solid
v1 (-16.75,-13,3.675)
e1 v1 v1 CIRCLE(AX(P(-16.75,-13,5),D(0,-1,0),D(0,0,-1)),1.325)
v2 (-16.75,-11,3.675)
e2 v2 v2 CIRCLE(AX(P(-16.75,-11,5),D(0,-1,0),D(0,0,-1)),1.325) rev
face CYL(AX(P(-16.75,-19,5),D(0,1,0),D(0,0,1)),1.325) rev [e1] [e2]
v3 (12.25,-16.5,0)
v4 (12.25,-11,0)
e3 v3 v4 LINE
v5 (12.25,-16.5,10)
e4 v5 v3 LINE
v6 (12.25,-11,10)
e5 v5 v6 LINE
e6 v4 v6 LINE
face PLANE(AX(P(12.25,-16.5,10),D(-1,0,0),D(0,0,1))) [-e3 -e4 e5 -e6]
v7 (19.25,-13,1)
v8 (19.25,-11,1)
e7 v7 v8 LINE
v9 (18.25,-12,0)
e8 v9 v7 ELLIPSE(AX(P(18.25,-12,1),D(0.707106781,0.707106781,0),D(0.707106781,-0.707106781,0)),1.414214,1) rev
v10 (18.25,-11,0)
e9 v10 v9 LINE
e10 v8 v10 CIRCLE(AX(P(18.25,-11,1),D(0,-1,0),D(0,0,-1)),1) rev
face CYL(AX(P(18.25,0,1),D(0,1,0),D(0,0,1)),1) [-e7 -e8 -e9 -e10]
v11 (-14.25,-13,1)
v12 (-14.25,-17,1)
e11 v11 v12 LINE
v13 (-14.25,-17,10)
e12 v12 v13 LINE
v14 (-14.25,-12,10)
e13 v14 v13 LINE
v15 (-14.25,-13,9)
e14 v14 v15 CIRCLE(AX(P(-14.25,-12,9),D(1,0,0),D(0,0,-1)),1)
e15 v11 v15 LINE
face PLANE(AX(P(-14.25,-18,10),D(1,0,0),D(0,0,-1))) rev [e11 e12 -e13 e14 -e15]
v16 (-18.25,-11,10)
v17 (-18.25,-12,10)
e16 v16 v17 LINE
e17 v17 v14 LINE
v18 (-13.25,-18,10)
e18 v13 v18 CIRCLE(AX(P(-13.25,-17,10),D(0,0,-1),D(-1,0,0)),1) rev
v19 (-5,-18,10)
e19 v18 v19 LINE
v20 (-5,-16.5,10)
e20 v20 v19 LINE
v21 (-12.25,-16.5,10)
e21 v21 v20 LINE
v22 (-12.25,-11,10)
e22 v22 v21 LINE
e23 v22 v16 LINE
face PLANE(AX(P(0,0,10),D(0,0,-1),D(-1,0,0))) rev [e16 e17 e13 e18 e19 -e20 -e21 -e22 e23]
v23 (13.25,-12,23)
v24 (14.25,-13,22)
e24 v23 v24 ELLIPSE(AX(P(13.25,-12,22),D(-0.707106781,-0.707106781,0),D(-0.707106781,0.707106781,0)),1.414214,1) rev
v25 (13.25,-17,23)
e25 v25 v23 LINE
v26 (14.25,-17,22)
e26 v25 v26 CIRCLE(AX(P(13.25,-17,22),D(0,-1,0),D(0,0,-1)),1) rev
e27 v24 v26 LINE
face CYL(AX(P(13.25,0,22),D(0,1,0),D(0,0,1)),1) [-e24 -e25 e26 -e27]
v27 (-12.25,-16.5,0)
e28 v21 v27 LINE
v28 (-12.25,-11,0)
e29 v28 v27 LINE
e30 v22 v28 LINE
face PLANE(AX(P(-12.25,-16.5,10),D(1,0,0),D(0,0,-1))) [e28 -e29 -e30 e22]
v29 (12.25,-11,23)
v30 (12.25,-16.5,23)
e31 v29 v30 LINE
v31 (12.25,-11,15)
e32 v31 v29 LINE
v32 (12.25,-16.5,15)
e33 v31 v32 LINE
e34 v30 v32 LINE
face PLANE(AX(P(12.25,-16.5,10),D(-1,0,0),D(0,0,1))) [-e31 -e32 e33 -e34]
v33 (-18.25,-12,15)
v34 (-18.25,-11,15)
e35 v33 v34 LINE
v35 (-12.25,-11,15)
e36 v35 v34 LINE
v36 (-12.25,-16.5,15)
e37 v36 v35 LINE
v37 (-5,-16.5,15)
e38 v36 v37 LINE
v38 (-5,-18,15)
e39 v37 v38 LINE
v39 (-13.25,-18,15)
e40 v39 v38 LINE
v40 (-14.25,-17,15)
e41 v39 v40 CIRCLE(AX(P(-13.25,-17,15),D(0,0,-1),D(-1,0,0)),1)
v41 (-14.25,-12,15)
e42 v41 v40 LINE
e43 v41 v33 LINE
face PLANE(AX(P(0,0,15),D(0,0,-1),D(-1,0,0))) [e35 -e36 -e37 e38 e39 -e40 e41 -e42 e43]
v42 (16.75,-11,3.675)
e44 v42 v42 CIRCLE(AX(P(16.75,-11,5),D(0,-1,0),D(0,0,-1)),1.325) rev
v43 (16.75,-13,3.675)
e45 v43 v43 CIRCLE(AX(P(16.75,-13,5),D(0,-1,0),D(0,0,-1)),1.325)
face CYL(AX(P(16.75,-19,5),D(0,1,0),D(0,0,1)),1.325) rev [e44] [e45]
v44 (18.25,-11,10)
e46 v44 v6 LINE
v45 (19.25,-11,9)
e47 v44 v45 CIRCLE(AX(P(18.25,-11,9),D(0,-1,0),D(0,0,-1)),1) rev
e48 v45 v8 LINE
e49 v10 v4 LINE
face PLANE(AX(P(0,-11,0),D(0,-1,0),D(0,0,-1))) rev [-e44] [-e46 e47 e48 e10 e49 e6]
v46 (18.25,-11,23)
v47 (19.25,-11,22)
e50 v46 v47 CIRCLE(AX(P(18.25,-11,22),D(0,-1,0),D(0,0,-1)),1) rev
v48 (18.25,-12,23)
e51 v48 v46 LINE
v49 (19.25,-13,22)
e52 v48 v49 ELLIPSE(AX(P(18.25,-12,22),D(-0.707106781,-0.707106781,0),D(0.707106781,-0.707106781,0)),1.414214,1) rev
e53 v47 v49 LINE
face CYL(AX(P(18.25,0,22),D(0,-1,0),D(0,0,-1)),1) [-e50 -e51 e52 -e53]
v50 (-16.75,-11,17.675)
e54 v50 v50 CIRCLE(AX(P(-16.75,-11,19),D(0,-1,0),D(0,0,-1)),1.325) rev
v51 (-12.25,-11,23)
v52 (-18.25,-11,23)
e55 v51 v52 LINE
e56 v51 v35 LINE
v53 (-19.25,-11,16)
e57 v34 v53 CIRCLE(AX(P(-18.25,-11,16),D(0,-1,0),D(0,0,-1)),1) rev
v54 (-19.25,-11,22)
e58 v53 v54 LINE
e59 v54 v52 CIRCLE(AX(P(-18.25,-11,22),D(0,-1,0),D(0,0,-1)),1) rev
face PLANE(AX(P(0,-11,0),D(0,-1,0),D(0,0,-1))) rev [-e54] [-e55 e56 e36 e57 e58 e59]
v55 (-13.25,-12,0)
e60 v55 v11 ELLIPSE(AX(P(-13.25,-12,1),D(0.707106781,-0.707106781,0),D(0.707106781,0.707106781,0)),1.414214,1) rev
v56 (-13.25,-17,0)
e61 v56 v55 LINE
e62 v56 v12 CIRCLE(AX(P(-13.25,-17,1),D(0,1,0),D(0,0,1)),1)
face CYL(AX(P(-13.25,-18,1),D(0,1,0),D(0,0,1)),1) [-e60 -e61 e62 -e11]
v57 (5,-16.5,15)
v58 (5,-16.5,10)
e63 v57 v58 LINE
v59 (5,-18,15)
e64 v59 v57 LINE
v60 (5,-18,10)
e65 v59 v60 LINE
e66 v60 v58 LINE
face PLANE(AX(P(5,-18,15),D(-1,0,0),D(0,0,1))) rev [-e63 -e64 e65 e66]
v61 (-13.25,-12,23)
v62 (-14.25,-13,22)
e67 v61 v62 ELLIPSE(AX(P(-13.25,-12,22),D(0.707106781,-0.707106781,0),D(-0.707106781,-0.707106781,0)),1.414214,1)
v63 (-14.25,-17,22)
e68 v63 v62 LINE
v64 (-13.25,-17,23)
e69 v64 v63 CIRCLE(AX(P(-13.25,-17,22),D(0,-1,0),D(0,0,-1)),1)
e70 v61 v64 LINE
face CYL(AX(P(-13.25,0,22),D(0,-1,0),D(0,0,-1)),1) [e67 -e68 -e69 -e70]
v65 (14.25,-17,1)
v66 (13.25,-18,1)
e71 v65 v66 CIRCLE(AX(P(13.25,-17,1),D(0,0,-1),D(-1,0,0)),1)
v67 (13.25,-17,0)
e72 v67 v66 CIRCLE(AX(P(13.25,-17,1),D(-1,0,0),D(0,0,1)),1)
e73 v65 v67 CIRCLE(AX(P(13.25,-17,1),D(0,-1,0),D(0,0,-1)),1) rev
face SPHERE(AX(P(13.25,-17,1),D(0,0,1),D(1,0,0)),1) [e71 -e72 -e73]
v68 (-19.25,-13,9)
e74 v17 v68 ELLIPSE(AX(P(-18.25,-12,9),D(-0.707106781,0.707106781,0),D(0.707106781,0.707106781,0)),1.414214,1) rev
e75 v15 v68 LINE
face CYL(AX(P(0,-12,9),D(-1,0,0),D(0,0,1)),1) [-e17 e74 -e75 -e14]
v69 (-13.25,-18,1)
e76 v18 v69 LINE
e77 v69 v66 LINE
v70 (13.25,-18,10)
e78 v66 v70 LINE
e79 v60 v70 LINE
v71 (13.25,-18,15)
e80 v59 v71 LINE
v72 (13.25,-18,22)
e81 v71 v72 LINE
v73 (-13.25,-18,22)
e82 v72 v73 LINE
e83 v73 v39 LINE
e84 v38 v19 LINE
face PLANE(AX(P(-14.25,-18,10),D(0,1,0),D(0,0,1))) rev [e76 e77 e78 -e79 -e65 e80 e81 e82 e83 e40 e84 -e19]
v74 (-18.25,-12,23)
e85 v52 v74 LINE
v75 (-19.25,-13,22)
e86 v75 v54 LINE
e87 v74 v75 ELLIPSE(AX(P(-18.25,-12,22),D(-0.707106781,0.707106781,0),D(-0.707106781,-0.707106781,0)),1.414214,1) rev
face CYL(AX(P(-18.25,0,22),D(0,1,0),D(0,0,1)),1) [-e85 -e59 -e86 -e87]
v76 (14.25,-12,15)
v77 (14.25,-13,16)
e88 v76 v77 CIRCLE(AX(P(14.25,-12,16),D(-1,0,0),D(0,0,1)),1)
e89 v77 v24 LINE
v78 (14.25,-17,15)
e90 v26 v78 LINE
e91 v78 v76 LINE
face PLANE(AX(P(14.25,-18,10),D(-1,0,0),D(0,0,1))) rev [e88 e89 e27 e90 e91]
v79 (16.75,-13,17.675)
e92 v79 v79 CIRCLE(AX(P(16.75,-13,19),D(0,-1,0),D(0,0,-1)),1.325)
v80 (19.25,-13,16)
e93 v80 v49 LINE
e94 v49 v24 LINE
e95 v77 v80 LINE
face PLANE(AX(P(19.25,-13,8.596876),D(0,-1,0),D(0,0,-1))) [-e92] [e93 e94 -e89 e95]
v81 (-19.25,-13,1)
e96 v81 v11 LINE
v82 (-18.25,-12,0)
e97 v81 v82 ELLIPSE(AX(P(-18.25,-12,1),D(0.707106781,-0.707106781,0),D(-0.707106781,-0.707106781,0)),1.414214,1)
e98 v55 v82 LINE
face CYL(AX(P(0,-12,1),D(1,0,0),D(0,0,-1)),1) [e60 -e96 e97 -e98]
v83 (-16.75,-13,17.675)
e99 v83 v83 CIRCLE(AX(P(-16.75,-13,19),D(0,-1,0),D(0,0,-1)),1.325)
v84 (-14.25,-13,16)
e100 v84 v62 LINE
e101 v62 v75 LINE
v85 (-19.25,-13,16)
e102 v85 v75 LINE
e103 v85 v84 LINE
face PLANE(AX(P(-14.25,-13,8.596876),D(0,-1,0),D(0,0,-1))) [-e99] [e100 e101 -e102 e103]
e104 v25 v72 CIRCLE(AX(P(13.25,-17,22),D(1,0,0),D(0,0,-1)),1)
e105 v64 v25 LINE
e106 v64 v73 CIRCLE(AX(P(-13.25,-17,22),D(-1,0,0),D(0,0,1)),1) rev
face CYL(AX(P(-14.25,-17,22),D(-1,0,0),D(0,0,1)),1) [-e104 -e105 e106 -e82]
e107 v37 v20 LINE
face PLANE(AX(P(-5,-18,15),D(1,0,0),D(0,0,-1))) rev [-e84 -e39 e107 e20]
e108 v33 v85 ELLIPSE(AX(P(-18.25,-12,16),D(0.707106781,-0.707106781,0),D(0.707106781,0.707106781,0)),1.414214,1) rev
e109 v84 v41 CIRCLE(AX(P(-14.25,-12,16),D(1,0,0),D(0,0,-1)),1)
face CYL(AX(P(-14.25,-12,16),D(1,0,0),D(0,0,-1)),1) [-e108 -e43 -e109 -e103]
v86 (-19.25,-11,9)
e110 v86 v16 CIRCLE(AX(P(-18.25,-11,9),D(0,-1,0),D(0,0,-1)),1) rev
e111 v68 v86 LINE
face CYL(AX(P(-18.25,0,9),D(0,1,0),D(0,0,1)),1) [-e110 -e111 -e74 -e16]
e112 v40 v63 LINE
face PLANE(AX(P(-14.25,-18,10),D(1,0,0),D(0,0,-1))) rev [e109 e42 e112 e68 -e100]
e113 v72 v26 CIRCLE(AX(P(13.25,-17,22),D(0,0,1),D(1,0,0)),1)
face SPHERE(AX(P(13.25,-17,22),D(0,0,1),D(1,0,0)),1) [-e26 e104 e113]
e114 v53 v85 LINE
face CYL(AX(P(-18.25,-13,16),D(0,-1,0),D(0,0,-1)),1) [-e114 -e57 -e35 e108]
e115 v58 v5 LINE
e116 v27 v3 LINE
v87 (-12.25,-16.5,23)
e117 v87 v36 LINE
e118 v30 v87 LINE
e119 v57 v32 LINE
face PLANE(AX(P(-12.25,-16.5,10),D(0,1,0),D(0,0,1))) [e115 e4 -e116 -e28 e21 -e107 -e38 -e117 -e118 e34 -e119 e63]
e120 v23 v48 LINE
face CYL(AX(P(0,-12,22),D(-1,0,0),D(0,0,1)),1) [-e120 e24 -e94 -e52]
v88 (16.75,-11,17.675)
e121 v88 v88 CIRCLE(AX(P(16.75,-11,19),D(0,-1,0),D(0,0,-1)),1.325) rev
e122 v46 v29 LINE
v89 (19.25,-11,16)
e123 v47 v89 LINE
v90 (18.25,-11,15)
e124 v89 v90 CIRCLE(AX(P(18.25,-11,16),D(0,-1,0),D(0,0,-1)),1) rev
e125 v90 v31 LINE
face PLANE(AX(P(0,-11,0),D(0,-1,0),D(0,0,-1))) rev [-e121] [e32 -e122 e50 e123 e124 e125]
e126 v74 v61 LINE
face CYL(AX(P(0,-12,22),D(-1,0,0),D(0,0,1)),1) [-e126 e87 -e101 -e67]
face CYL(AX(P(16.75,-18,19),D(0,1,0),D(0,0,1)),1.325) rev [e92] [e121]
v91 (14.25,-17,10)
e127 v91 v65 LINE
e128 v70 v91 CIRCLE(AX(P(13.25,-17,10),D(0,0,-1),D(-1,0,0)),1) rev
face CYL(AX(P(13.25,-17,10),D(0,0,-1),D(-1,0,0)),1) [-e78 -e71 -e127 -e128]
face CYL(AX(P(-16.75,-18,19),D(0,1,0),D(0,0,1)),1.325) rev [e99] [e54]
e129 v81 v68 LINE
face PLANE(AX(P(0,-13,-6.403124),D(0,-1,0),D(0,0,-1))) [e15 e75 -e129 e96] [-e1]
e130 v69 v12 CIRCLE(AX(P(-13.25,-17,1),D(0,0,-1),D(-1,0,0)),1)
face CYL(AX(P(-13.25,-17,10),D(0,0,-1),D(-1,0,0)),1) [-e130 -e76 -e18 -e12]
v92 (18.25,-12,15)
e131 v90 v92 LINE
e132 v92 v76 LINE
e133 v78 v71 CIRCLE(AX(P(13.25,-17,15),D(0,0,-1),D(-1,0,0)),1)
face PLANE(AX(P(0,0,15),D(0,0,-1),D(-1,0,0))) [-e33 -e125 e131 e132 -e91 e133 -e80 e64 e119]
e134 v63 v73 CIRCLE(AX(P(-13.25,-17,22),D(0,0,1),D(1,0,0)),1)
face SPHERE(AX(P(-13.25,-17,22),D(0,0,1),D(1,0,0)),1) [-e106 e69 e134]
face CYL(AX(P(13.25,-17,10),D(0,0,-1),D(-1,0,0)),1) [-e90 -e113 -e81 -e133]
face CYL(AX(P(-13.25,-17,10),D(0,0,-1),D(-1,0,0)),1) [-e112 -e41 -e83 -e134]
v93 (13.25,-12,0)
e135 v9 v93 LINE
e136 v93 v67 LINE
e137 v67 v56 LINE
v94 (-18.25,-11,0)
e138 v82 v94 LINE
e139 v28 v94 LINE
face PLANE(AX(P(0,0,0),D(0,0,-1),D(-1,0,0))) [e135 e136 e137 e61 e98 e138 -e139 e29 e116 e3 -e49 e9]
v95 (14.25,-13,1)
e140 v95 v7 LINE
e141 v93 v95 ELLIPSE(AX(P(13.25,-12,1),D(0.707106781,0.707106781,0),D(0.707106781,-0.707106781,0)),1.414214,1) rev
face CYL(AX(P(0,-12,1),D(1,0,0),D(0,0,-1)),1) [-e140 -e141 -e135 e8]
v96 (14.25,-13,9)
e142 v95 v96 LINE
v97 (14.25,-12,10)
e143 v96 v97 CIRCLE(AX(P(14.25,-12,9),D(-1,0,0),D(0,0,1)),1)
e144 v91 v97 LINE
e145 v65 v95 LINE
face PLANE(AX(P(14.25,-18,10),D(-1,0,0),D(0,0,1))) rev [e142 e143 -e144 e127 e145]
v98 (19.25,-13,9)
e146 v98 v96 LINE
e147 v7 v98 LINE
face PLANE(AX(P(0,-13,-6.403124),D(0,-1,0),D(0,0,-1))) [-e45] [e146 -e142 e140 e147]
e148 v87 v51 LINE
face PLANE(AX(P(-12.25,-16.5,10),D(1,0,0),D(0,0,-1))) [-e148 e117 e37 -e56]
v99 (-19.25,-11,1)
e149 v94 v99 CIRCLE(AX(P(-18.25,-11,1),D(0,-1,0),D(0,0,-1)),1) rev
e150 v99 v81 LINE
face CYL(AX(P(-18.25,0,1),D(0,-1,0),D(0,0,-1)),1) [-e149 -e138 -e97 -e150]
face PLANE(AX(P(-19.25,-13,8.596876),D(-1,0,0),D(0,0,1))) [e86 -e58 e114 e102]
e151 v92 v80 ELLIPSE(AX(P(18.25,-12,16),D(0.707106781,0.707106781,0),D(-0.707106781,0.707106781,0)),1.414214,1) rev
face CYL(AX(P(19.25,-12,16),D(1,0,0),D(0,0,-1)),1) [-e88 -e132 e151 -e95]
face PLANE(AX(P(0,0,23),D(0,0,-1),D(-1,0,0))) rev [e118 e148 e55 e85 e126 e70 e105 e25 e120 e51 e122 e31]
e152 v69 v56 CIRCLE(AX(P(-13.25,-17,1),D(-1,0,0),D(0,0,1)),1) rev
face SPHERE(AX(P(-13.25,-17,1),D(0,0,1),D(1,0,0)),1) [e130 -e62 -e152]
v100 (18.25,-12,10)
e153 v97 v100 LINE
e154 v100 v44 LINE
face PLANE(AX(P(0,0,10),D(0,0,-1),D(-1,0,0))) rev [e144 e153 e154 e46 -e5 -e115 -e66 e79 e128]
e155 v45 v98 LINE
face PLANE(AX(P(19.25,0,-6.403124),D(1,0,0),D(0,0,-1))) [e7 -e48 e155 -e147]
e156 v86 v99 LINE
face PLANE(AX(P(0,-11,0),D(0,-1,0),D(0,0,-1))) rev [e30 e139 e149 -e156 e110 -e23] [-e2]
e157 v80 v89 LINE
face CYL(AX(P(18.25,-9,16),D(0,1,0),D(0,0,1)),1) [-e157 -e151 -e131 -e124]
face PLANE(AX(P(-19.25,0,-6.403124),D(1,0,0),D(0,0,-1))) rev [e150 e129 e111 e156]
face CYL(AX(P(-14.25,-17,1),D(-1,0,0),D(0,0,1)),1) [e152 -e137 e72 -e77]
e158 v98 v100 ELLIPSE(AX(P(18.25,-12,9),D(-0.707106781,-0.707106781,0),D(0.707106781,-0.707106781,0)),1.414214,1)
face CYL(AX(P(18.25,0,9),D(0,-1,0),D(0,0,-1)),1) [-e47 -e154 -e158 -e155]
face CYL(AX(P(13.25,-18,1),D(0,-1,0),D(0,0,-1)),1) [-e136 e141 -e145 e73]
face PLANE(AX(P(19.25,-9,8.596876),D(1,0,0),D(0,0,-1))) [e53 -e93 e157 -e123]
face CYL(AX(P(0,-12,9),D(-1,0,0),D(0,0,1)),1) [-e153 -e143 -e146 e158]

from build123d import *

# Parameters (mm, degrees)
SKETCH1_W           = 28.5
SKETCH1_H           = 36
SKETCH1_W_2         = 24.5
SKETCH1_H_2         = 33
BOSS_EXTRUDE1_DEPTH = 10
SKETCH2_W           = 5
SKETCH2_H           = 4
BOSS_EXTRUDE2_DEPTH = 10
SKETCH3_R           = 1.325
CUT_EXTRUDE1_DEPTH  = 10
FILLET1_R           = 1
FILLET2_R           = 1
CUT_EXTRUDE2_DEPTH  = 40.322385482
SKETCH5_W           = 15
SKETCH5_H           = 1.5
SKETCH5_W_2         = 2
SKETCH5_H_2         = 10
BOSS_EXTRUDE3_DEPTH = 5
SKETCH6_W           = 10
SKETCH6_H           = 1.5
BOSS_EXTRUDE4_DEPTH = 5
BOSS_EXTRUDE5_DEPTH = 8
SKETCH8_W           = 7
SKETCH8_H           = 3
CUT_EXTRUDE3_DEPTH  = 5
SKETCH9_W           = 5
SKETCH9_H           = 2.1
CUT_EXTRUDE4_DEPTH  = 5
SKETCH10_W          = 10
SKETCH10_H          = 1.5
BOSS_EXTRUDE6_DEPTH = 8
SKETCH11_W          = 5
SKETCH11_H          = 4
BOSS_EXTRUDE7_DEPTH = 8
SKETCH12_R          = 1.325
CUT_EXTRUDE5_DEPTH  = 42.37405588
CUT_EXTRUDE6_DEPTH  = 46.072164359
FILLET3_R           = 1


with BuildPart() as part:
    # Sketch1 → Boss-Extrude1 (new body)
    with BuildSketch(Plane.XY):
        Rectangle(SKETCH1_W, SKETCH1_H)
        Rectangle(SKETCH1_W_2, SKETCH1_H_2, mode=Mode.SUBTRACT)
    extrude(amount=BOSS_EXTRUDE1_DEPTH)

    # Sketch2 → Boss-Extrude2 (add)
    with BuildSketch(Plane.XY.offset(10)):
        with Locations((-16.75, -11)):
            Rectangle(SKETCH2_W, SKETCH2_H)
        with Locations((16.75, -11)):
            Rectangle(SKETCH2_W, SKETCH2_H)
    extrude(amount=-BOSS_EXTRUDE2_DEPTH)

    # Sketch3 → Cut-Extrude1 (cut)
    with BuildSketch(Plane(origin=(0, -9, 0), x_dir=(1, 0, 0), z_dir=(0, 1, 0))):
        with Locations(Location((-16.75, -5, 0), (0, 0, 270))):
            Circle(SKETCH3_R)
        with Locations(Location((16.75, -5, 0), (0, 0, 270))):
            Circle(SKETCH3_R)
    extrude(amount=-CUT_EXTRUDE1_DEPTH, mode=Mode.SUBTRACT)


with BuildPart() as body_2:
    # Split1: the piece on the far side of the plane
    add(part.part)
    split(bisect_by=Plane(origin=(0, -11, 0), x_dir=(0, 0, -1), z_dir=(0, -1, 0)), keep=Keep.BOTTOM)

    # Fillet1
    fillet1_edges = [body_2.edges().sort_by_distance(p)[0] for p in [
        (-16.75, -9, 10),
        (-19.25, -10, 10),
        (-19.25, -10, 0),
        (-16.75, -9, 0),
        (14.25, 4.5, 0),
        (0, 18, 0),
        (-14.25, 4.5, 0),
        (16.75, -9, 0),
        (19.25, -10, 10),
        (19.25, -10, 0),
        (16.75, -9, 10),
    ]]
    fillet(fillet1_edges, radius=FILLET1_R)

    # Sketch4 → Cut-Extrude2 (cut, through all)
    with BuildSketch(Plane.ZY.offset(14.25)):
        with BuildLine():
            Line((7, 12.5), (7, -3.5))
            ThreePointArc((7, -3.5), (5, -5.5), (3, -3.5))
            Line((3, -3.5), (3, 12.5))
            ThreePointArc((3, 12.5), (5, 14.5), (7, 12.5))
        make_face()
    extrude(amount=-CUT_EXTRUDE2_DEPTH, mode=Mode.SUBTRACT)

    # Sketch5 → Boss-Extrude3 (add)
    with BuildSketch(Plane.XY.offset(10)):
        with Locations((0, 17.25)):
            Rectangle(SKETCH5_W, SKETCH5_H)
        with Locations((-13.25, 4)):
            Rectangle(SKETCH5_W_2, SKETCH5_H_2)
        with Locations((13.25, 4)):
            Rectangle(SKETCH5_W_2, SKETCH5_H_2)
    extrude(amount=BOSS_EXTRUDE3_DEPTH)



with BuildPart() as part_1:
    add(part.part)

    # Split1
    split(bisect_by=Plane(origin=(0, -11, 0), x_dir=(0, 0, -1), z_dir=(0, -1, 0)), keep=Keep.TOP)

    # Fillet2
    fillet2_edges = [part_1.edges().sort_by_distance(p)[0] for p in [
        (-14.25, -15.5, 0),
        (-16.75, -13, 0),
        (-19.25, -12, 10),
        (-16.75, -13, 10),
        (-19.25, -12, 0),
        (16.75, -13, 10),
        (19.25, -12, 10),
        (19.25, -12, 0),
        (16.75, -13, 0),
        (0, -18, 0),
        (14.25, -15.5, 0),
    ]]
    fillet(fillet2_edges, radius=FILLET2_R)

    # Sketch6 → Boss-Extrude4 (add)
    with BuildSketch(Plane.XY.offset(10)):
        with Locations((0, -17.25)):
            Rectangle(SKETCH6_W, SKETCH6_H)
    extrude(amount=BOSS_EXTRUDE4_DEPTH)


with BuildPart() as body_2_1:
    add(body_2.part)

    add(part_1.part)  # Boss-Extrude5 merges part
    # Sketch7 → Boss-Extrude5 (add)
    with BuildSketch(Plane.XY.offset(15)):
        Polygon((14.25, 9), (14.25, 18), (14.25, 19.5), (-14.25, 19.5), (-14.25, 18), (-14.25, 9), (-14.25, -1), (-14.25, -10), (-14.25, -11), (-12.25, -11), (-12.25, -1), (-12.25, 9), (-12.25, 16.5), (-7.5, 16.5), (7.5, 16.5), (12.25, 16.5), (12.25, 9), (12.25, -1), (12.25, -11), (14.25, -11), (14.25, -10), (14.25, -1), align=None)
    extrude(amount=BOSS_EXTRUDE5_DEPTH)

    # Sketch8 → Cut-Extrude3 (cut)
    with BuildSketch(Plane.XY.offset(23)):
        with Locations((0, 16.5)):
            Rectangle(SKETCH8_W, SKETCH8_H)
    extrude(amount=-CUT_EXTRUDE3_DEPTH, mode=Mode.SUBTRACT)

    # Sketch9 → Cut-Extrude4 (cut)
    with BuildSketch(Plane.XY.offset(23)):
        with Locations((6, 17.55)):
            Rectangle(SKETCH9_W, SKETCH9_H)
        with Locations((-6, 17.55)):
            Rectangle(SKETCH9_W, SKETCH9_H)
    extrude(amount=-CUT_EXTRUDE4_DEPTH, mode=Mode.SUBTRACT)

    # Sketch10 → Boss-Extrude6 (add)
    with BuildSketch(Plane.XY.offset(15)):
        Polygon((-5, -18), (-5, -16.5), (-12.25, -16.5), (-12.25, -11), (-14.25, -11), (-14.25, -12), (-14.25, -18), align=None)
        with Locations((0, -17.25)):
            Rectangle(SKETCH10_W, SKETCH10_H)
        Polygon((12.25, -11), (12.25, -16.5), (5, -16.5), (5, -18), (14.25, -18), (14.25, -12), (14.25, -11), align=None)
    extrude(amount=BOSS_EXTRUDE6_DEPTH)

    # Sketch11 → Boss-Extrude7 (add)
    with BuildSketch(Plane.XY.offset(23)):
        with Locations((-16.75, -11)):
            Rectangle(SKETCH11_W, SKETCH11_H)
        with Locations((16.75, -11)):
            Rectangle(SKETCH11_W, SKETCH11_H)
    extrude(amount=-BOSS_EXTRUDE7_DEPTH)

    # Sketch12 → Cut-Extrude5 (cut, through all)
    with BuildSketch(Plane(origin=(0, -9, 0), x_dir=(1, 0, 0), z_dir=(0, 1, 0))):
        with Locations(Location((-16.75, -19, 0), (0, 0, 270))):
            Circle(SKETCH12_R)
        with Locations(Location((16.75, -19, 0), (0, 0, 270))):
            Circle(SKETCH12_R)
    extrude(amount=-CUT_EXTRUDE5_DEPTH, mode=Mode.SUBTRACT)

    # Sketch13 → Cut-Extrude6 (cut, through all)
    with BuildSketch(Plane.ZY.offset(14.25)):
        with BuildLine():
            Line((17, -3.5), (17, 12.5))
            ThreePointArc((17, 12.5), (19, 14.5), (21, 12.5))
            Line((21, 12.5), (21, -3.5))
            ThreePointArc((21, -3.5), (19, -5.5), (17, -3.5))
        make_face()
    extrude(amount=-CUT_EXTRUDE6_DEPTH, mode=Mode.SUBTRACT)

    # Fillet3
    # the kernel refuses this fillet: 1 mm, written as the material it takes off along each edge
    with BuildSketch(Plane(origin=(13.25, -17, 1), x_dir=(1, 0, 0), z_dir=(0, -1, 0))) as fillet3_piece_1_section:
        Polygon((0, 0), (FILLET3_R, 0), (FILLET3_R, -FILLET3_R), (0, -FILLET3_R), align=None)
    fillet3_piece_1 = extrude(amount=FILLET3_R, mode=Mode.PRIVATE)
    fillet3_piece_1 = fillet3_piece_1 - Plane(origin=(13.25, -17, 1), x_dir=(-0.7071067811865475, 0, 0.7071067811865475), z_dir=(0, -1, 0)) * Sphere(FILLET3_R, mode=Mode.PRIVATE)
    add(fillet3_piece_1, mode=Mode.SUBTRACT)
    with BuildSketch(Plane(origin=(-13.25, -17, 1), x_dir=(-1, 0, 0), z_dir=(0, -1, 0))) as fillet3_piece_2_section:
        Polygon((0, 0), (FILLET3_R, 0), (FILLET3_R, FILLET3_R), (0, FILLET3_R), align=None)
    fillet3_piece_2 = extrude(amount=FILLET3_R, mode=Mode.PRIVATE)
    fillet3_piece_2 = fillet3_piece_2 - Plane(origin=(-13.25, -17, 1), x_dir=(0.7071067811865475, 0, 0.7071067811865475), z_dir=(0, -1, 0)) * Sphere(FILLET3_R, mode=Mode.PRIVATE)
    add(fillet3_piece_2, mode=Mode.SUBTRACT)
    with BuildSketch(Plane(origin=(13.25, 17, 1), x_dir=(0, 1, 0), z_dir=(1, 0, 0))) as fillet3_piece_3_section:
        Polygon((0, 0), (FILLET3_R, 0), (FILLET3_R, -FILLET3_R), (0, -FILLET3_R), align=None)
    fillet3_piece_3 = extrude(amount=FILLET3_R, mode=Mode.PRIVATE)
    fillet3_piece_3 = fillet3_piece_3 - Plane(origin=(13.25, 17, 1), x_dir=(0, -0.7071067811865475, 0.7071067811865475), z_dir=(1, 0, 0)) * Sphere(FILLET3_R, mode=Mode.PRIVATE)
    add(fillet3_piece_3, mode=Mode.SUBTRACT)
    with BuildSketch(Plane(origin=(-13.25, 17, 1), x_dir=(0, 1, 0), z_dir=(-1, 0, 0))) as fillet3_piece_4_section:
        Polygon((0, 0), (FILLET3_R, 0), (FILLET3_R, FILLET3_R), (0, FILLET3_R), align=None)
    fillet3_piece_4 = extrude(amount=FILLET3_R, mode=Mode.PRIVATE)
    fillet3_piece_4 = fillet3_piece_4 - Plane(origin=(-13.25, 17, 1), x_dir=(0, -0.7071067811865475, 0.7071067811865475), z_dir=(-1, 0, 0)) * Sphere(FILLET3_R, mode=Mode.PRIVATE)
    add(fillet3_piece_4, mode=Mode.SUBTRACT)
    with BuildSketch(Plane(origin=(13.25, -17, 22), x_dir=(0, 0, 1), z_dir=(0, -1, 0))) as fillet3_piece_5_section:
        Polygon((0, 0), (FILLET3_R, 0), (FILLET3_R, -FILLET3_R), (0, -FILLET3_R), align=None)
    fillet3_piece_5 = extrude(amount=FILLET3_R, mode=Mode.PRIVATE)
    fillet3_piece_5 = fillet3_piece_5 - Plane(origin=(13.25, -17, 22), x_dir=(-0.7071067811865475, 0, -0.7071067811865475), z_dir=(0, -1, 0)) * Sphere(FILLET3_R, mode=Mode.PRIVATE)
    add(fillet3_piece_5, mode=Mode.SUBTRACT)
    with BuildSketch(Plane(origin=(-13.25, -17, 22), x_dir=(-1, 0, 0), z_dir=(0, -1, 0))) as fillet3_piece_6_section:
        Polygon((0, 0), (FILLET3_R, 0), (FILLET3_R, -FILLET3_R), (0, -FILLET3_R), align=None)
    fillet3_piece_6 = extrude(amount=FILLET3_R, mode=Mode.PRIVATE)
    fillet3_piece_6 = fillet3_piece_6 - Plane(origin=(-13.25, -17, 22), x_dir=(0.7071067811865475, 0, -0.7071067811865475), z_dir=(0, -1, 0)) * Sphere(FILLET3_R, mode=Mode.PRIVATE)
    add(fillet3_piece_6, mode=Mode.SUBTRACT)
    with BuildSketch(Plane(origin=(-14.25, 18, 1), x_dir=(0, -1, 0), z_dir=(0, 0, 1)), Plane(origin=(-14.25, -18, 1), x_dir=(1, 0, 0), z_dir=(0, 0, 1))) as fillet3_piece_7:
        with BuildLine():
            CenterArc((FILLET3_R, FILLET3_R), FILLET3_R, 180, 90)
            Line((0, FILLET3_R), (0, 0))
            Line((0, 0), (FILLET3_R, 0))
        make_face()
    extrude(amount=11.5, mode=Mode.SUBTRACT)
    with BuildSketch(Plane(origin=(14.25, 18, 1), x_dir=(0, -1, 0), z_dir=(0, 0, 1)), Plane(origin=(14.25, -18, 1), x_dir=(-1, 0, 0), z_dir=(0, 0, 1))) as fillet3_piece_8:
        with BuildLine():
            CenterArc((FILLET3_R, -FILLET3_R), FILLET3_R, 90, 90)
            Line((0, -FILLET3_R), (0, 0))
            Line((0, 0), (FILLET3_R, 0))
        make_face()
    extrude(amount=11.5, mode=Mode.SUBTRACT)
    with BuildSketch(Plane(origin=(14.25, 19.5, 12.5), x_dir=(0, -1, 0), z_dir=(0, 0, 1))) as fillet3_piece_9:
        with BuildLine():
            CenterArc((FILLET3_R, -FILLET3_R), FILLET3_R, 90, 90)
            Line((0, -FILLET3_R), (0, 0))
            Line((0, 0), (FILLET3_R, 0))
        make_face()
    extrude(amount=13, mode=Mode.SUBTRACT)
    with BuildSketch(Plane(origin=(-14.25, 19.5, 12.5), x_dir=(0, -1, 0), z_dir=(0, 0, 1))) as fillet3_piece_10:
        with BuildLine():
            CenterArc((FILLET3_R, FILLET3_R), FILLET3_R, 180, 90)
            Line((0, FILLET3_R), (0, 0))
            Line((0, 0), (FILLET3_R, 0))
        make_face()
    extrude(amount=13, mode=Mode.SUBTRACT)
    with BuildSketch(Plane(origin=(14.25, -17, 23), x_dir=(-1, 0, 0), z_dir=(0, 1, 0)), Plane(origin=(-14.25, -17, 23), x_dir=(0, 0, -1), z_dir=(0, 1, 0))) as fillet3_piece_11:
        with BuildLine():
            CenterArc((FILLET3_R, -FILLET3_R), FILLET3_R, 90, 90)
            Line((0, -FILLET3_R), (0, 0))
            Line((0, 0), (FILLET3_R, 0))
        make_face()
    extrude(amount=4, mode=Mode.SUBTRACT)
    with BuildSketch(Plane(origin=(-14.25, -9, 23), x_dir=(1, 0, 0), z_dir=(0, 1, 0))) as fillet3_piece_12:
        with BuildLine():
            CenterArc((FILLET3_R, FILLET3_R), FILLET3_R, 180, 90)
            Line((0, FILLET3_R), (0, 0))
            Line((0, 0), (FILLET3_R, 0))
        make_face()
    extrude(amount=31, mode=Mode.SUBTRACT)
    with BuildSketch(Plane(origin=(-13.25, -18, 23), x_dir=(0, 0, -1), z_dir=(1, 0, 0))) as fillet3_piece_13:
        with BuildLine():
            CenterArc((FILLET3_R, FILLET3_R), FILLET3_R, 180, 90)
            Line((0, FILLET3_R), (0, 0))
            Line((0, 0), (FILLET3_R, 0))
        make_face()
    extrude(amount=26.5, mode=Mode.SUBTRACT)
    with BuildSketch(Plane(origin=(-14.25, -18, 12.5), x_dir=(1, 0, 0), z_dir=(0, 0, 1))) as fillet3_piece_14:
        with BuildLine():
            CenterArc((FILLET3_R, FILLET3_R), FILLET3_R, 180, 90)
            Line((0, FILLET3_R), (0, 0))
            Line((0, 0), (FILLET3_R, 0))
        make_face()
    extrude(amount=9.5, mode=Mode.SUBTRACT)
    with BuildSketch(Plane(origin=(14.25, -18, 12.5), x_dir=(-1, 0, 0), z_dir=(0, 0, 1))) as fillet3_piece_15:
        with BuildLine():
            CenterArc((FILLET3_R, -FILLET3_R), FILLET3_R, 90, 90)
            Line((0, -FILLET3_R), (0, 0))
            Line((0, 0), (FILLET3_R, 0))
        make_face()
    extrude(amount=9.5, mode=Mode.SUBTRACT)
    with BuildSketch(Plane(origin=(-21.75, -9, 23), x_dir=(0, -1, 0), z_dir=(1, 0, 0)), Plane(origin=(-14.25, -13, 23), x_dir=(0, 1, 0), z_dir=(-1, 0, 0)), Plane(origin=(14.25, -9, 23), x_dir=(0, -1, 0), z_dir=(1, 0, 0)), Plane(origin=(21.75, -13, 23), x_dir=(0, 1, 0), z_dir=(-1, 0, 0))) as fillet3_piece_16:
        with BuildLine():
            CenterArc((FILLET3_R, FILLET3_R), FILLET3_R, 180, 90)
            Line((0, FILLET3_R), (0, 0))
            Line((0, 0), (FILLET3_R, 0))
        make_face()
    extrude(amount=7.5, mode=Mode.SUBTRACT)
    with BuildSketch(Plane(origin=(-19.25, -15.5, 23), x_dir=(1, 0, 0), z_dir=(0, 1, 0)), Plane(origin=(19.25, -6.5, 23), x_dir=(-1, 0, 0), z_dir=(0, -1, 0))) as fillet3_piece_17:
        with BuildLine():
            CenterArc((FILLET3_R, FILLET3_R), FILLET3_R, 180, 90)
            Line((0, FILLET3_R), (0, 0))
            Line((0, 0), (FILLET3_R, 0))
        make_face()
    extrude(amount=9, mode=Mode.SUBTRACT)
    with BuildSketch(Plane(origin=(-21.75, -9, 15), x_dir=(0, -1, 0), z_dir=(1, 0, 0)), Plane(origin=(-14.25, -13, 15), x_dir=(0, 1, 0), z_dir=(-1, 0, 0)), Plane(origin=(14.25, -9, 15), x_dir=(0, -1, 0), z_dir=(1, 0, 0)), Plane(origin=(21.75, -13, 15), x_dir=(0, 1, 0), z_dir=(-1, 0, 0))) as fillet3_piece_18:
        with BuildLine():
            CenterArc((FILLET3_R, -FILLET3_R), FILLET3_R, 90, 90)
            Line((0, -FILLET3_R), (0, 0))
            Line((0, 0), (FILLET3_R, 0))
        make_face()
    extrude(amount=7.5, mode=Mode.SUBTRACT)
    with BuildSketch(Plane(origin=(-19.25, -15.5, 15), x_dir=(1, 0, 0), z_dir=(0, 1, 0)), Plane(origin=(19.25, -6.5, 15), x_dir=(-1, 0, 0), z_dir=(0, -1, 0))) as fillet3_piece_19:
        with BuildLine():
            CenterArc((FILLET3_R, -FILLET3_R), FILLET3_R, 90, 90)
            Line((0, -FILLET3_R), (0, 0))
            Line((0, 0), (FILLET3_R, 0))
        make_face()
    extrude(amount=9, mode=Mode.SUBTRACT)
    with BuildSketch(Plane(origin=(14.25, -9, 23), x_dir=(-1, 0, 0), z_dir=(0, 1, 0))) as fillet3_piece_20:
        with BuildLine():
            CenterArc((FILLET3_R, -FILLET3_R), FILLET3_R, 90, 90)
            Line((0, -FILLET3_R), (0, 0))
            Line((0, 0), (FILLET3_R, 0))
        make_face()
    extrude(amount=31, mode=Mode.SUBTRACT)
    with BuildSketch(Plane(origin=(14.25, -17, 23), x_dir=(-1, 0, 0), z_dir=(0, 1, 0))) as fillet3_piece_21a_section:
        with BuildLine():
            CenterArc((FILLET3_R, -FILLET3_R), FILLET3_R, 90, 90)
            Line((0, -FILLET3_R), (0, 0))
            Line((0, 0), (FILLET3_R, 0))
        make_face()
    fillet3_piece_21a = extrude(amount=6.5, mode=Mode.PRIVATE)
    fillet3_piece_21a = split(fillet3_piece_21a, bisect_by=Plane(origin=(14.023604886, -13, 22.773604886), z_dir=(0, 1, 0)), keep=Keep.TOP, mode=Mode.PRIVATE)
    with BuildSketch(Plane(origin=(21.75, -13, 23), x_dir=(0, 1, 0), z_dir=(-1, 0, 0))) as fillet3_piece_21b_section:
        with BuildLine():
            CenterArc((FILLET3_R, FILLET3_R), FILLET3_R, 180, 90)
            Line((0, FILLET3_R), (0, 0))
            Line((0, 0), (FILLET3_R, 0))
        make_face()
    fillet3_piece_21b = extrude(amount=10, mode=Mode.PRIVATE)
    fillet3_piece_21b = split(fillet3_piece_21b, bisect_by=Plane(origin=(14.25, -12.773604886, 22.773604886), z_dir=(-1, 0, 0)), keep=Keep.TOP, mode=Mode.PRIVATE)
    fillet3_piece_21 = fillet3_piece_21a & fillet3_piece_21b
    add(fillet3_piece_21, mode=Mode.SUBTRACT)
    with BuildSketch(Plane(origin=(-14.25, -11.5, 23), x_dir=(1, 0, 0), z_dir=(0, 1, 0))) as fillet3_piece_22a_section:
        with BuildLine():
            CenterArc((FILLET3_R, FILLET3_R), FILLET3_R, 180, 90)
            Line((0, FILLET3_R), (0, 0))
            Line((0, 0), (FILLET3_R, 0))
        make_face()
    fillet3_piece_22a = extrude(amount=33.5, mode=Mode.PRIVATE)
    fillet3_piece_22a = split(fillet3_piece_22a, bisect_by=Plane(origin=(-14.023604886, -9, 22.773604886), z_dir=(0, -1, 0)), keep=Keep.TOP, mode=Mode.PRIVATE)
    with BuildSketch(Plane(origin=(-21.75, -9, 23), x_dir=(0, -1, 0), z_dir=(1, 0, 0))) as fillet3_piece_22b_section:
        with BuildLine():
            CenterArc((FILLET3_R, FILLET3_R), FILLET3_R, 180, 90)
            Line((0, FILLET3_R), (0, 0))
            Line((0, 0), (FILLET3_R, 0))
        make_face()
    fillet3_piece_22b = extrude(amount=10, mode=Mode.PRIVATE)
    fillet3_piece_22b = split(fillet3_piece_22b, bisect_by=Plane(origin=(-14.25, -9.226395114, 22.773604886), z_dir=(1, 0, 0)), keep=Keep.TOP, mode=Mode.PRIVATE)
    fillet3_piece_22 = fillet3_piece_22a & fillet3_piece_22b
    add(fillet3_piece_22, mode=Mode.SUBTRACT)
    with BuildSketch(Plane(origin=(-14.25, -17, 23), x_dir=(0, 0, -1), z_dir=(0, 1, 0))) as fillet3_piece_23a_section:
        with BuildLine():
            CenterArc((FILLET3_R, -FILLET3_R), FILLET3_R, 90, 90)
            Line((0, -FILLET3_R), (0, 0))
            Line((0, 0), (FILLET3_R, 0))
        make_face()
    fillet3_piece_23a = extrude(amount=6.5, mode=Mode.PRIVATE)
    fillet3_piece_23a = split(fillet3_piece_23a, bisect_by=Plane(origin=(-14.023604886, -13, 22.773604886), z_dir=(0, 1, 0)), keep=Keep.TOP, mode=Mode.PRIVATE)
    with BuildSketch(Plane(origin=(-11.75, -13, 23), x_dir=(0, 1, 0), z_dir=(-1, 0, 0))) as fillet3_piece_23b_section:
        with BuildLine():
            CenterArc((FILLET3_R, FILLET3_R), FILLET3_R, 180, 90)
            Line((0, FILLET3_R), (0, 0))
            Line((0, 0), (FILLET3_R, 0))
        make_face()
    fillet3_piece_23b = extrude(amount=10, mode=Mode.PRIVATE)
    fillet3_piece_23b = split(fillet3_piece_23b, bisect_by=Plane(origin=(-14.25, -12.773604886, 22.773604886), z_dir=(1, 0, 0)), keep=Keep.TOP, mode=Mode.PRIVATE)
    fillet3_piece_23 = fillet3_piece_23a & fillet3_piece_23b
    add(fillet3_piece_23, mode=Mode.SUBTRACT)
    with BuildSketch(Plane(origin=(11.75, -9, 23), x_dir=(0, -1, 0), z_dir=(1, 0, 0))) as fillet3_piece_24a_section:
        with BuildLine():
            CenterArc((FILLET3_R, FILLET3_R), FILLET3_R, 180, 90)
            Line((0, FILLET3_R), (0, 0))
            Line((0, 0), (FILLET3_R, 0))
        make_face()
    fillet3_piece_24a = extrude(amount=10, mode=Mode.PRIVATE)
    fillet3_piece_24a = split(fillet3_piece_24a, bisect_by=Plane(origin=(14.25, -9.226395114, 22.773604886), z_dir=(-1, 0, 0)), keep=Keep.TOP, mode=Mode.PRIVATE)
    with BuildSketch(Plane(origin=(14.25, -11.5, 23), x_dir=(-1, 0, 0), z_dir=(0, 1, 0))) as fillet3_piece_24b_section:
        with BuildLine():
            CenterArc((FILLET3_R, -FILLET3_R), FILLET3_R, 90, 90)
            Line((0, -FILLET3_R), (0, 0))
            Line((0, 0), (FILLET3_R, 0))
        make_face()
    fillet3_piece_24b = extrude(amount=33.5, mode=Mode.PRIVATE)
    fillet3_piece_24b = split(fillet3_piece_24b, bisect_by=Plane(origin=(14.023604886, -9, 22.773604886), z_dir=(0, -1, 0)), keep=Keep.TOP, mode=Mode.PRIVATE)
    fillet3_piece_24 = fillet3_piece_24a & fillet3_piece_24b
    add(fillet3_piece_24, mode=Mode.SUBTRACT)


with BuildPart() as body_2_2:
    # Split2: the piece on the far side of the plane
    add(body_2_1.part)
    split(bisect_by=Plane(origin=(0, -11, 0), x_dir=(0, 0, -1), z_dir=(0, -1, 0)), keep=Keep.BOTTOM)


with BuildPart() as body_2_3:
    add(body_2_1.part)

    # Split2
    split(bisect_by=Plane(origin=(0, -11, 0), x_dir=(0, 0, -1), z_dir=(0, -1, 0)), keep=Keep.TOP)


solid = body_2_3.part
